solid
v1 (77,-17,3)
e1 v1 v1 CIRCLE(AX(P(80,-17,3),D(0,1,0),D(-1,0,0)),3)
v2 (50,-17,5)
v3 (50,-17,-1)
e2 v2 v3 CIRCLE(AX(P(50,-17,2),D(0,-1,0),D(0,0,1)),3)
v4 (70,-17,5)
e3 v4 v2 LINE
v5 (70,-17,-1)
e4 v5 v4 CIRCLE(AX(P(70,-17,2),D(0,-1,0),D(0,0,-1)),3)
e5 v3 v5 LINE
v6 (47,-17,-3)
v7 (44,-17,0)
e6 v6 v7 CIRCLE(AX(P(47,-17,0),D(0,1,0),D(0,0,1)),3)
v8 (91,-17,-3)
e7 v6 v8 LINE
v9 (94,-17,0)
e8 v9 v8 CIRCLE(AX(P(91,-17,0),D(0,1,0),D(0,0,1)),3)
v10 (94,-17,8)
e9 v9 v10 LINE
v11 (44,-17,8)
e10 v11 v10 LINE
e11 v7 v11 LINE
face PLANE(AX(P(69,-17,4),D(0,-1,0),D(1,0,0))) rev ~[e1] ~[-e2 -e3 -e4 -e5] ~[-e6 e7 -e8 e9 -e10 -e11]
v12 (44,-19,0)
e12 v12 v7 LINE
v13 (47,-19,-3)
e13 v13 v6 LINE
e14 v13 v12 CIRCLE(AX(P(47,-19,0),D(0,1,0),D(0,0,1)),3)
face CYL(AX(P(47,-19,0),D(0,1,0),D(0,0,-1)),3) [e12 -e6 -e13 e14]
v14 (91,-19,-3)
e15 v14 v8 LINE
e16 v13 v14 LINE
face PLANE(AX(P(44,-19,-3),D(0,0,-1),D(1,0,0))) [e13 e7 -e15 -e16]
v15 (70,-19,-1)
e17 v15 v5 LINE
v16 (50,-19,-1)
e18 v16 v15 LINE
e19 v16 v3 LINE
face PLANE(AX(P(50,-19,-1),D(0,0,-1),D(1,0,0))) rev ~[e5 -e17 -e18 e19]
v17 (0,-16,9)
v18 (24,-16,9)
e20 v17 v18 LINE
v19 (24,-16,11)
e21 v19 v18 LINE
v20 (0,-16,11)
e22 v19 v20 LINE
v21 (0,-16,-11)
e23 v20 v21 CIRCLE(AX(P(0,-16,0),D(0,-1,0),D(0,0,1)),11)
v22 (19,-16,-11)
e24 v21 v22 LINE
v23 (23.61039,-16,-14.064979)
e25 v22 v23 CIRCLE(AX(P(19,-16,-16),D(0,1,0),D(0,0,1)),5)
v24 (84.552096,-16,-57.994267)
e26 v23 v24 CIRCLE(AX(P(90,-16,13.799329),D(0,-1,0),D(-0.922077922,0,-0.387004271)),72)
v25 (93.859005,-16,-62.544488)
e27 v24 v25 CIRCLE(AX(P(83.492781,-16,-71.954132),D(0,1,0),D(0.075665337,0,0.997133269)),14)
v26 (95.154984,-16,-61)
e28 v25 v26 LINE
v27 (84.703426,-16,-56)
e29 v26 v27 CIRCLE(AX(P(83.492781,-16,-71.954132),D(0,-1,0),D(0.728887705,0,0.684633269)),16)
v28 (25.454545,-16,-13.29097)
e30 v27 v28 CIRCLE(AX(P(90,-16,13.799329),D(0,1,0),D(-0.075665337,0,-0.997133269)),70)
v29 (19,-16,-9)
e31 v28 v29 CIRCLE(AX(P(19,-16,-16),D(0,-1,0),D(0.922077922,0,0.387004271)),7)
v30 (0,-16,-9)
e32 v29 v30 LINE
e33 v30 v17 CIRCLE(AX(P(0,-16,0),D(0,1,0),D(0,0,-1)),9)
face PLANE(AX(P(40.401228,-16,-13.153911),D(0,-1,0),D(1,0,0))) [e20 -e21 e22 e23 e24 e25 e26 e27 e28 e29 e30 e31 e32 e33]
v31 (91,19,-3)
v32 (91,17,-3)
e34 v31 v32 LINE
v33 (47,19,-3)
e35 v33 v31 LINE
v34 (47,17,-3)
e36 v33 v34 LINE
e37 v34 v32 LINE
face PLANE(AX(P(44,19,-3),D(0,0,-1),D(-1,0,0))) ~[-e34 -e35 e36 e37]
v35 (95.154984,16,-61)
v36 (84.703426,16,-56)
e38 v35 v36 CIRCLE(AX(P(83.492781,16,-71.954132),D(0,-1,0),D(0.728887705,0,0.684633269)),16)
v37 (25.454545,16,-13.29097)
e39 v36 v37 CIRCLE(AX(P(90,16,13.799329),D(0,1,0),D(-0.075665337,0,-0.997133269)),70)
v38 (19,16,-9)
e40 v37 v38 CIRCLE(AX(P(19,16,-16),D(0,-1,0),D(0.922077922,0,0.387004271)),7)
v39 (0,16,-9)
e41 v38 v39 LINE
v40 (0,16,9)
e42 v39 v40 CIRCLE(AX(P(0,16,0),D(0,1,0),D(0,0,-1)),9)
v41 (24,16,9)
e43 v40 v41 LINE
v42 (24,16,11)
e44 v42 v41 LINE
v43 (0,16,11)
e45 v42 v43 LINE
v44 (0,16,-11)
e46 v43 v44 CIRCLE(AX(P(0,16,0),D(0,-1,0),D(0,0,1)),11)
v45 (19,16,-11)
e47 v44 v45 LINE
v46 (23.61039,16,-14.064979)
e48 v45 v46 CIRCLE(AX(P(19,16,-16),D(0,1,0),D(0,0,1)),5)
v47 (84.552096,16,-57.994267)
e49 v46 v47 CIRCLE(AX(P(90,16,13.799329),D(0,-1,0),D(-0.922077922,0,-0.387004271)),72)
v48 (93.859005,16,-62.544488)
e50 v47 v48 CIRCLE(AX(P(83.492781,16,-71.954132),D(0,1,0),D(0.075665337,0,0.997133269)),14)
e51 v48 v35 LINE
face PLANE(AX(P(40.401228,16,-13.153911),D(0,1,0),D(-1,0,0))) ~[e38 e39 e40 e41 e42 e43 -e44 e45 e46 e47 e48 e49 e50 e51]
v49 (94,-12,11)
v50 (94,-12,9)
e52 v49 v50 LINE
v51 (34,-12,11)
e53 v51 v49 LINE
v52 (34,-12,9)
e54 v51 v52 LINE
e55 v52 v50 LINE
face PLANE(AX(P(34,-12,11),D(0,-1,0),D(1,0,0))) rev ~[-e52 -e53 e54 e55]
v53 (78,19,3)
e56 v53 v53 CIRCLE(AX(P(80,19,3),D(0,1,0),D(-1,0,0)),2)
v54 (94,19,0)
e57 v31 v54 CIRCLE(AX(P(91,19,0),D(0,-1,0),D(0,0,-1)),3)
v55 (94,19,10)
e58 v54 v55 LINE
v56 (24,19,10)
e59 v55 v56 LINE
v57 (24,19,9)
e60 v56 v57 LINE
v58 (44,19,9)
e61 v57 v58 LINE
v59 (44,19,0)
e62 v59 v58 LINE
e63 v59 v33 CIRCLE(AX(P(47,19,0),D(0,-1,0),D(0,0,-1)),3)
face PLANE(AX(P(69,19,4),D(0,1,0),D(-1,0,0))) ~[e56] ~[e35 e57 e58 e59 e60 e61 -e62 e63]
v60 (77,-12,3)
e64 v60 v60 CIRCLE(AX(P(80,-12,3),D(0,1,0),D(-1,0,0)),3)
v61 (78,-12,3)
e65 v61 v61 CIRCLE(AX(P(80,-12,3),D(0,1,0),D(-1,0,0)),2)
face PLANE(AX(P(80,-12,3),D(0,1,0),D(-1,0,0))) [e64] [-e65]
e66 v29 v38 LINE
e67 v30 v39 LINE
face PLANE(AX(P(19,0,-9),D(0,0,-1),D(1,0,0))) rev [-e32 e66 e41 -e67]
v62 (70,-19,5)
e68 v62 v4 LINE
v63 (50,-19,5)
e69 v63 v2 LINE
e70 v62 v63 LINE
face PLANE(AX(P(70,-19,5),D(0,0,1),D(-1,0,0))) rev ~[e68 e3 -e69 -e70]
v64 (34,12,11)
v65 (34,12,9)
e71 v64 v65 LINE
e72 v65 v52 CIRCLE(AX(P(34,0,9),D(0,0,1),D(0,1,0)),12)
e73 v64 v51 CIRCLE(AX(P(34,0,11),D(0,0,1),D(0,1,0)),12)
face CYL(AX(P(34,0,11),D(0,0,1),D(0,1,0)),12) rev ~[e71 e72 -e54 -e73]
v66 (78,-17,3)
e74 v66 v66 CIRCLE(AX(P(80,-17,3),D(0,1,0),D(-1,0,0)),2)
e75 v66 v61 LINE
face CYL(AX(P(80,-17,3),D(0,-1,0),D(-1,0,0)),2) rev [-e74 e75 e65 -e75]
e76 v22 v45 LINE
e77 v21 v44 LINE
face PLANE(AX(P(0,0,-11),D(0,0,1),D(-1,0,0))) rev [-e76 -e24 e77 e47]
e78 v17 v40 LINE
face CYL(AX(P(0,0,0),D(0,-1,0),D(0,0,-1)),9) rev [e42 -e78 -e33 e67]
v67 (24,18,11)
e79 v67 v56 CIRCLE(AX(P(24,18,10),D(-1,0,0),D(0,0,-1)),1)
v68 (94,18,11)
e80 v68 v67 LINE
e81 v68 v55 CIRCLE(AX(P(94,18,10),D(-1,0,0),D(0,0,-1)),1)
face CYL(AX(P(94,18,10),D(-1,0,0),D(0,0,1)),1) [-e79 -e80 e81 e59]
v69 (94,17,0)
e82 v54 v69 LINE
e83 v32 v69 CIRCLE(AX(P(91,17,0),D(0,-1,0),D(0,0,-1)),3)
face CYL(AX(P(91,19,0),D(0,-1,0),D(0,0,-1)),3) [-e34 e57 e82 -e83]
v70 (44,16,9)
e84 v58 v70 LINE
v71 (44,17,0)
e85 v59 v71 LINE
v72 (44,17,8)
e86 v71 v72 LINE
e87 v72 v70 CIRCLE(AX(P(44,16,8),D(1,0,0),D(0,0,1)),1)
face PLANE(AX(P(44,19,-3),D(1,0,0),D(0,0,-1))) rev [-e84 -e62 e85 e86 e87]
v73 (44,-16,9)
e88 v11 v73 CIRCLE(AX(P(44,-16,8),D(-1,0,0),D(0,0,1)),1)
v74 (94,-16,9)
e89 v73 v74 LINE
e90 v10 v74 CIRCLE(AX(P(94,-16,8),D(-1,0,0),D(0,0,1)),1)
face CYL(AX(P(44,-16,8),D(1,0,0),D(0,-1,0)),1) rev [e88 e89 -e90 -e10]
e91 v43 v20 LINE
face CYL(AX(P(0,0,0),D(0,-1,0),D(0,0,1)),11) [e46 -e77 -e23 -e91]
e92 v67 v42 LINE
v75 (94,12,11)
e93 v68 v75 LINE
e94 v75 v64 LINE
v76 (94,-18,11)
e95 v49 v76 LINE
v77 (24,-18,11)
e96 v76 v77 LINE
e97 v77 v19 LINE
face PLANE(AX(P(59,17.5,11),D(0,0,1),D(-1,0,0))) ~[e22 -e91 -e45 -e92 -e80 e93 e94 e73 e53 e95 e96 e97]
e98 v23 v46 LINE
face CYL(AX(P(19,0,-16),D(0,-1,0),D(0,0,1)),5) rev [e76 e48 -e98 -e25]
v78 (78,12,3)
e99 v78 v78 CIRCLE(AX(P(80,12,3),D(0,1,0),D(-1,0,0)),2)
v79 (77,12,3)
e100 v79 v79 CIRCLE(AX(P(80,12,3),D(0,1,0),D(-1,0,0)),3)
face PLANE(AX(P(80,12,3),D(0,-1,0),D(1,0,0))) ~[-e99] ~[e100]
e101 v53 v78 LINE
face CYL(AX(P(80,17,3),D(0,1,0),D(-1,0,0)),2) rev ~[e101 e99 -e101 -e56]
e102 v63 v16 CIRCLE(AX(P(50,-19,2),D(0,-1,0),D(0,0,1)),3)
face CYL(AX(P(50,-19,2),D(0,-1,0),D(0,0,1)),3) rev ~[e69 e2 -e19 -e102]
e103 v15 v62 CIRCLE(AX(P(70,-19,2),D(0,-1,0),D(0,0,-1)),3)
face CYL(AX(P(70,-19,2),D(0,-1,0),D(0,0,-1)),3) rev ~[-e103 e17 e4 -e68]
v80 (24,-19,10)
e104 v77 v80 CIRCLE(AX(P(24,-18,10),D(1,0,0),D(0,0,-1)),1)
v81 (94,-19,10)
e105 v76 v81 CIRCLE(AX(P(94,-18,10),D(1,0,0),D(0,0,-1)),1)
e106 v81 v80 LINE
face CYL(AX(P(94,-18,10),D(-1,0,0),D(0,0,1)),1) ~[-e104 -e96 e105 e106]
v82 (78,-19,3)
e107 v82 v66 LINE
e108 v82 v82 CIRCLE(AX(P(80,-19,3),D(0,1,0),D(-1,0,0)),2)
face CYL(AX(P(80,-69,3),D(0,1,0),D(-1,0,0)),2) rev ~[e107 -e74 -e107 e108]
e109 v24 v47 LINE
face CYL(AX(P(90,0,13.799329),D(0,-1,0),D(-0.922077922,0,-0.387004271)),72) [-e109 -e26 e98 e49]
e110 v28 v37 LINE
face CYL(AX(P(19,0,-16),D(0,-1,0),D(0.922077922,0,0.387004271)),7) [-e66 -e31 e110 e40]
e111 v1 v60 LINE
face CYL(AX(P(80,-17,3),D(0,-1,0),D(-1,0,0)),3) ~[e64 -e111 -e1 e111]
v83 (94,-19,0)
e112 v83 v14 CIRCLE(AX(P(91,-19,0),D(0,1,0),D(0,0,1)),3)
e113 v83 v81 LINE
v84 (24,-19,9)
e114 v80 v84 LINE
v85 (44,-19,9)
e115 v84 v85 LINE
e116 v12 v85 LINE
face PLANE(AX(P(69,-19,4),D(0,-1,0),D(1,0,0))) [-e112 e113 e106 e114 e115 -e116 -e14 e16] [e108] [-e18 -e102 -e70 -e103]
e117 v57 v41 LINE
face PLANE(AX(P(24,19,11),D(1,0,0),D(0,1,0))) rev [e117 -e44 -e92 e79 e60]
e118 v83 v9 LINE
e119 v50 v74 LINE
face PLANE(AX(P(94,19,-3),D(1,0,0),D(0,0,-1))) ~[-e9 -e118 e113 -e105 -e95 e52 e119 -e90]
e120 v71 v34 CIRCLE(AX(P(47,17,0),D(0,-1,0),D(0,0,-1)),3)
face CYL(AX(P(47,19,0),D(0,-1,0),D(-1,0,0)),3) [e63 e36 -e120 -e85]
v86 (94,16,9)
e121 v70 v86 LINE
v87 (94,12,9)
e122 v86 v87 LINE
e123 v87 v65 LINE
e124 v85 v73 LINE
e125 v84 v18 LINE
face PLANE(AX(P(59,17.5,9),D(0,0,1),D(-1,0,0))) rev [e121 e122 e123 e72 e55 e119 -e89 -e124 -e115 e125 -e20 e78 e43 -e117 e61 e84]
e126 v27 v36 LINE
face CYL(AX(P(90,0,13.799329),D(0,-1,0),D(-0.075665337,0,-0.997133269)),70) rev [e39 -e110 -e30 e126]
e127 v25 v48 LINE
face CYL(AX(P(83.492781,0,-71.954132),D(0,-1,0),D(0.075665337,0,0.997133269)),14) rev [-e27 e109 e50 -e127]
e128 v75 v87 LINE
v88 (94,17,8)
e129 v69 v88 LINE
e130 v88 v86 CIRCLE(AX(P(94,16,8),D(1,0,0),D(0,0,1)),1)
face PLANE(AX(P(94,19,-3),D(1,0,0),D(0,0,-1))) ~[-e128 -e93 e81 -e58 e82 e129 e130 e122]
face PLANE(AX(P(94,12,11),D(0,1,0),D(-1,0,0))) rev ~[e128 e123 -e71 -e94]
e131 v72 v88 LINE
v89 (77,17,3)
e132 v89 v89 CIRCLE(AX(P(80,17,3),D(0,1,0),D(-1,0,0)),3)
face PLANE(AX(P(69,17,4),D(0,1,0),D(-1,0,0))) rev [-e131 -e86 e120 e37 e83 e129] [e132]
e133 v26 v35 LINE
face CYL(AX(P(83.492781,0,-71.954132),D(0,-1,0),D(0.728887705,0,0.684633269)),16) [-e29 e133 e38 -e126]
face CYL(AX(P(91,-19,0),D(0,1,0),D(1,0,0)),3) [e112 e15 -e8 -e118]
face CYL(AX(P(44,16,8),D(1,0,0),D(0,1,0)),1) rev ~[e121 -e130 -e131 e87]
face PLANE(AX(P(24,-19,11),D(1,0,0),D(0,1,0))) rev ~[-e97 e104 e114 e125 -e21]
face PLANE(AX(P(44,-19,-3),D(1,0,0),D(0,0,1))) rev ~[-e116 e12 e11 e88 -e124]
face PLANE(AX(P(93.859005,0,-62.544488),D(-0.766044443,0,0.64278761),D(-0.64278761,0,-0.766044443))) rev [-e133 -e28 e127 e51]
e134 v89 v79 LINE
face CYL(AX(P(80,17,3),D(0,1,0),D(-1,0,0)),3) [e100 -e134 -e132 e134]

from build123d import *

# Parameters (mm, degrees)
F1_DEPTH  = 16
F2_W      = 70
F2_H      = 3
F3_DEPTH  = 2
F4_W      = 50
F4_H      = 14
F5_DEPTH  = 2
F6_R      = 1
F9_DEPTH  = 2
F11_DEPTH = 25
F13_D     = 4
F13_DEPTH = 50
F13_TIP   = 1.2017212381
F14_R     = 3
F14_R_2   = 2
F15_DEPTH = 5
F16_R     = 3


# Not quite as in the source:
# - a pattern or mirror of a feature is missing from the dataset's text; its kind, count and spacing are read off the source's solid


with BuildPart() as f1:
    # F0 (on Front) → F1 (new body)
    with BuildSketch(Plane.XZ):
        with BuildLine():
            Line((94, 11), (0, 11))
            ThreePointArc((0, 11), (-11, 0), (0, -11))
            Line((0, -11), (19, -11))
            ThreePointArc((19, -11), (21.7681124643, -11.8361612201), (23.6103896104, -14.064978646))
            ThreePointArc((23.6103896104, -14.064978646), (47.8977113224, -44.6078392712), (84.5520957277, -57.9942665386))
            ThreePointArc((84.5520957277, -57.9942665386), (89.6419160729, -59.3768457194), (93.8590048523, -62.5444881493))
            Line((93.8590048523, -62.5444881493), (95.1549842887, -61))
            ThreePointArc((95.1549842887, -61), (90.3976747979, -57.5207528796), (84.7034264019, -56))
            ThreePointArc((84.7034264019, -56), (49.0672193413, -42.9854179344), (25.4545454545, -13.2909701044))
            ThreePointArc((25.4545454545, -13.2909701044), (22.87535745, -10.1706257081), (19, -9))
            Line((19, -9), (0, -9))
            ThreePointArc((0, -9), (-9, 0), (0, 9))
            Line((0, 9), (94, 9))
            Line((94, 9), (94, 11))
        make_face()
    extrude(amount=F1_DEPTH)

    # F2 (on face) → F3 (join)
    with BuildSketch(Plane.XY.offset(11)):
        with Locations((59, -17.5)):
            Rectangle(F2_W, F2_H)
    extrude(amount=-F3_DEPTH)

    # F4 (on face) → F5 (join)
    with BuildSketch(Plane.XZ.offset(19)):
        with Locations((69, 4)):
            Rectangle(F4_W, F4_H)
    extrude(amount=-F5_DEPTH)

    # F6
    f6_edges = [f1.edges().sort_by_distance(p)[0] for p in [
        (59, -19, 11),
        (69, -17, 9),
    ]]
    fillet(f6_edges, radius=F6_R)

    # F7: F1 across plane


with BuildPart() as f1_1:
    add(f1.part)
    add(f1.part.mirror(Plane.XZ))

    # F8 (on face) → F9 (cut)
    with BuildSketch(Plane.XY.offset(11)):
        with BuildLine():
            Line((94, 12), (34, 12))
            ThreePointArc((34, 12), (22, 0), (34, -12))
            Line((34, -12), (94, -12))
            Line((94, -12), (94, 12))
        make_face()
    extrude(amount=-F9_DEPTH, mode=Mode.SUBTRACT)

    # F10 (on face) → F11 (cut)
    with BuildSketch(Plane.XZ.offset(19)):
        with BuildLine():
            ThreePointArc((50, 5), (47, 2), (50, -1))
            Line((50, -1), (70, -1))
            ThreePointArc((70, -1), (73, 2), (70, 5))
            Line((70, 5), (50, 5))
        make_face()
    extrude(amount=-F11_DEPTH, mode=Mode.SUBTRACT)

    # F13
    with Locations(Plane.XZ.offset(19)):
        with Locations((80, 3)):
            Hole(F13_D / 2, depth=F13_DEPTH)
            with Locations((0, 0, -(F13_DEPTH + F13_TIP / 2))):  # 118° drill point
                Cone(0, F13_D / 2, F13_TIP, mode=Mode.SUBTRACT)

    # F14 (on face) → F15 (join)
    with BuildSketch(Plane(origin=(0, -17, 0), x_dir=(-1, 0, 0), z_dir=(0, 1, 0))):
        with Locations((-80, 3)):
            Circle(F14_R)
        with Locations((-80, 3)):
            Circle(F14_R_2, mode=Mode.SUBTRACT)
    f15 = extrude(amount=F15_DEPTH)

    # F15_copies: F15 across plane
    add(f15.mirror(Plane.ZX))

    # F16
    f16_edges = [f1_1.edges().sort_by_distance(p)[0] for p in [
        (94, -18, -3),
        (94, 18, -3),
        (44, -18, -3),
        (44, 18, -3),
    ]]
    fillet(f16_edges, radius=F16_R)


solid = f1_1.part
